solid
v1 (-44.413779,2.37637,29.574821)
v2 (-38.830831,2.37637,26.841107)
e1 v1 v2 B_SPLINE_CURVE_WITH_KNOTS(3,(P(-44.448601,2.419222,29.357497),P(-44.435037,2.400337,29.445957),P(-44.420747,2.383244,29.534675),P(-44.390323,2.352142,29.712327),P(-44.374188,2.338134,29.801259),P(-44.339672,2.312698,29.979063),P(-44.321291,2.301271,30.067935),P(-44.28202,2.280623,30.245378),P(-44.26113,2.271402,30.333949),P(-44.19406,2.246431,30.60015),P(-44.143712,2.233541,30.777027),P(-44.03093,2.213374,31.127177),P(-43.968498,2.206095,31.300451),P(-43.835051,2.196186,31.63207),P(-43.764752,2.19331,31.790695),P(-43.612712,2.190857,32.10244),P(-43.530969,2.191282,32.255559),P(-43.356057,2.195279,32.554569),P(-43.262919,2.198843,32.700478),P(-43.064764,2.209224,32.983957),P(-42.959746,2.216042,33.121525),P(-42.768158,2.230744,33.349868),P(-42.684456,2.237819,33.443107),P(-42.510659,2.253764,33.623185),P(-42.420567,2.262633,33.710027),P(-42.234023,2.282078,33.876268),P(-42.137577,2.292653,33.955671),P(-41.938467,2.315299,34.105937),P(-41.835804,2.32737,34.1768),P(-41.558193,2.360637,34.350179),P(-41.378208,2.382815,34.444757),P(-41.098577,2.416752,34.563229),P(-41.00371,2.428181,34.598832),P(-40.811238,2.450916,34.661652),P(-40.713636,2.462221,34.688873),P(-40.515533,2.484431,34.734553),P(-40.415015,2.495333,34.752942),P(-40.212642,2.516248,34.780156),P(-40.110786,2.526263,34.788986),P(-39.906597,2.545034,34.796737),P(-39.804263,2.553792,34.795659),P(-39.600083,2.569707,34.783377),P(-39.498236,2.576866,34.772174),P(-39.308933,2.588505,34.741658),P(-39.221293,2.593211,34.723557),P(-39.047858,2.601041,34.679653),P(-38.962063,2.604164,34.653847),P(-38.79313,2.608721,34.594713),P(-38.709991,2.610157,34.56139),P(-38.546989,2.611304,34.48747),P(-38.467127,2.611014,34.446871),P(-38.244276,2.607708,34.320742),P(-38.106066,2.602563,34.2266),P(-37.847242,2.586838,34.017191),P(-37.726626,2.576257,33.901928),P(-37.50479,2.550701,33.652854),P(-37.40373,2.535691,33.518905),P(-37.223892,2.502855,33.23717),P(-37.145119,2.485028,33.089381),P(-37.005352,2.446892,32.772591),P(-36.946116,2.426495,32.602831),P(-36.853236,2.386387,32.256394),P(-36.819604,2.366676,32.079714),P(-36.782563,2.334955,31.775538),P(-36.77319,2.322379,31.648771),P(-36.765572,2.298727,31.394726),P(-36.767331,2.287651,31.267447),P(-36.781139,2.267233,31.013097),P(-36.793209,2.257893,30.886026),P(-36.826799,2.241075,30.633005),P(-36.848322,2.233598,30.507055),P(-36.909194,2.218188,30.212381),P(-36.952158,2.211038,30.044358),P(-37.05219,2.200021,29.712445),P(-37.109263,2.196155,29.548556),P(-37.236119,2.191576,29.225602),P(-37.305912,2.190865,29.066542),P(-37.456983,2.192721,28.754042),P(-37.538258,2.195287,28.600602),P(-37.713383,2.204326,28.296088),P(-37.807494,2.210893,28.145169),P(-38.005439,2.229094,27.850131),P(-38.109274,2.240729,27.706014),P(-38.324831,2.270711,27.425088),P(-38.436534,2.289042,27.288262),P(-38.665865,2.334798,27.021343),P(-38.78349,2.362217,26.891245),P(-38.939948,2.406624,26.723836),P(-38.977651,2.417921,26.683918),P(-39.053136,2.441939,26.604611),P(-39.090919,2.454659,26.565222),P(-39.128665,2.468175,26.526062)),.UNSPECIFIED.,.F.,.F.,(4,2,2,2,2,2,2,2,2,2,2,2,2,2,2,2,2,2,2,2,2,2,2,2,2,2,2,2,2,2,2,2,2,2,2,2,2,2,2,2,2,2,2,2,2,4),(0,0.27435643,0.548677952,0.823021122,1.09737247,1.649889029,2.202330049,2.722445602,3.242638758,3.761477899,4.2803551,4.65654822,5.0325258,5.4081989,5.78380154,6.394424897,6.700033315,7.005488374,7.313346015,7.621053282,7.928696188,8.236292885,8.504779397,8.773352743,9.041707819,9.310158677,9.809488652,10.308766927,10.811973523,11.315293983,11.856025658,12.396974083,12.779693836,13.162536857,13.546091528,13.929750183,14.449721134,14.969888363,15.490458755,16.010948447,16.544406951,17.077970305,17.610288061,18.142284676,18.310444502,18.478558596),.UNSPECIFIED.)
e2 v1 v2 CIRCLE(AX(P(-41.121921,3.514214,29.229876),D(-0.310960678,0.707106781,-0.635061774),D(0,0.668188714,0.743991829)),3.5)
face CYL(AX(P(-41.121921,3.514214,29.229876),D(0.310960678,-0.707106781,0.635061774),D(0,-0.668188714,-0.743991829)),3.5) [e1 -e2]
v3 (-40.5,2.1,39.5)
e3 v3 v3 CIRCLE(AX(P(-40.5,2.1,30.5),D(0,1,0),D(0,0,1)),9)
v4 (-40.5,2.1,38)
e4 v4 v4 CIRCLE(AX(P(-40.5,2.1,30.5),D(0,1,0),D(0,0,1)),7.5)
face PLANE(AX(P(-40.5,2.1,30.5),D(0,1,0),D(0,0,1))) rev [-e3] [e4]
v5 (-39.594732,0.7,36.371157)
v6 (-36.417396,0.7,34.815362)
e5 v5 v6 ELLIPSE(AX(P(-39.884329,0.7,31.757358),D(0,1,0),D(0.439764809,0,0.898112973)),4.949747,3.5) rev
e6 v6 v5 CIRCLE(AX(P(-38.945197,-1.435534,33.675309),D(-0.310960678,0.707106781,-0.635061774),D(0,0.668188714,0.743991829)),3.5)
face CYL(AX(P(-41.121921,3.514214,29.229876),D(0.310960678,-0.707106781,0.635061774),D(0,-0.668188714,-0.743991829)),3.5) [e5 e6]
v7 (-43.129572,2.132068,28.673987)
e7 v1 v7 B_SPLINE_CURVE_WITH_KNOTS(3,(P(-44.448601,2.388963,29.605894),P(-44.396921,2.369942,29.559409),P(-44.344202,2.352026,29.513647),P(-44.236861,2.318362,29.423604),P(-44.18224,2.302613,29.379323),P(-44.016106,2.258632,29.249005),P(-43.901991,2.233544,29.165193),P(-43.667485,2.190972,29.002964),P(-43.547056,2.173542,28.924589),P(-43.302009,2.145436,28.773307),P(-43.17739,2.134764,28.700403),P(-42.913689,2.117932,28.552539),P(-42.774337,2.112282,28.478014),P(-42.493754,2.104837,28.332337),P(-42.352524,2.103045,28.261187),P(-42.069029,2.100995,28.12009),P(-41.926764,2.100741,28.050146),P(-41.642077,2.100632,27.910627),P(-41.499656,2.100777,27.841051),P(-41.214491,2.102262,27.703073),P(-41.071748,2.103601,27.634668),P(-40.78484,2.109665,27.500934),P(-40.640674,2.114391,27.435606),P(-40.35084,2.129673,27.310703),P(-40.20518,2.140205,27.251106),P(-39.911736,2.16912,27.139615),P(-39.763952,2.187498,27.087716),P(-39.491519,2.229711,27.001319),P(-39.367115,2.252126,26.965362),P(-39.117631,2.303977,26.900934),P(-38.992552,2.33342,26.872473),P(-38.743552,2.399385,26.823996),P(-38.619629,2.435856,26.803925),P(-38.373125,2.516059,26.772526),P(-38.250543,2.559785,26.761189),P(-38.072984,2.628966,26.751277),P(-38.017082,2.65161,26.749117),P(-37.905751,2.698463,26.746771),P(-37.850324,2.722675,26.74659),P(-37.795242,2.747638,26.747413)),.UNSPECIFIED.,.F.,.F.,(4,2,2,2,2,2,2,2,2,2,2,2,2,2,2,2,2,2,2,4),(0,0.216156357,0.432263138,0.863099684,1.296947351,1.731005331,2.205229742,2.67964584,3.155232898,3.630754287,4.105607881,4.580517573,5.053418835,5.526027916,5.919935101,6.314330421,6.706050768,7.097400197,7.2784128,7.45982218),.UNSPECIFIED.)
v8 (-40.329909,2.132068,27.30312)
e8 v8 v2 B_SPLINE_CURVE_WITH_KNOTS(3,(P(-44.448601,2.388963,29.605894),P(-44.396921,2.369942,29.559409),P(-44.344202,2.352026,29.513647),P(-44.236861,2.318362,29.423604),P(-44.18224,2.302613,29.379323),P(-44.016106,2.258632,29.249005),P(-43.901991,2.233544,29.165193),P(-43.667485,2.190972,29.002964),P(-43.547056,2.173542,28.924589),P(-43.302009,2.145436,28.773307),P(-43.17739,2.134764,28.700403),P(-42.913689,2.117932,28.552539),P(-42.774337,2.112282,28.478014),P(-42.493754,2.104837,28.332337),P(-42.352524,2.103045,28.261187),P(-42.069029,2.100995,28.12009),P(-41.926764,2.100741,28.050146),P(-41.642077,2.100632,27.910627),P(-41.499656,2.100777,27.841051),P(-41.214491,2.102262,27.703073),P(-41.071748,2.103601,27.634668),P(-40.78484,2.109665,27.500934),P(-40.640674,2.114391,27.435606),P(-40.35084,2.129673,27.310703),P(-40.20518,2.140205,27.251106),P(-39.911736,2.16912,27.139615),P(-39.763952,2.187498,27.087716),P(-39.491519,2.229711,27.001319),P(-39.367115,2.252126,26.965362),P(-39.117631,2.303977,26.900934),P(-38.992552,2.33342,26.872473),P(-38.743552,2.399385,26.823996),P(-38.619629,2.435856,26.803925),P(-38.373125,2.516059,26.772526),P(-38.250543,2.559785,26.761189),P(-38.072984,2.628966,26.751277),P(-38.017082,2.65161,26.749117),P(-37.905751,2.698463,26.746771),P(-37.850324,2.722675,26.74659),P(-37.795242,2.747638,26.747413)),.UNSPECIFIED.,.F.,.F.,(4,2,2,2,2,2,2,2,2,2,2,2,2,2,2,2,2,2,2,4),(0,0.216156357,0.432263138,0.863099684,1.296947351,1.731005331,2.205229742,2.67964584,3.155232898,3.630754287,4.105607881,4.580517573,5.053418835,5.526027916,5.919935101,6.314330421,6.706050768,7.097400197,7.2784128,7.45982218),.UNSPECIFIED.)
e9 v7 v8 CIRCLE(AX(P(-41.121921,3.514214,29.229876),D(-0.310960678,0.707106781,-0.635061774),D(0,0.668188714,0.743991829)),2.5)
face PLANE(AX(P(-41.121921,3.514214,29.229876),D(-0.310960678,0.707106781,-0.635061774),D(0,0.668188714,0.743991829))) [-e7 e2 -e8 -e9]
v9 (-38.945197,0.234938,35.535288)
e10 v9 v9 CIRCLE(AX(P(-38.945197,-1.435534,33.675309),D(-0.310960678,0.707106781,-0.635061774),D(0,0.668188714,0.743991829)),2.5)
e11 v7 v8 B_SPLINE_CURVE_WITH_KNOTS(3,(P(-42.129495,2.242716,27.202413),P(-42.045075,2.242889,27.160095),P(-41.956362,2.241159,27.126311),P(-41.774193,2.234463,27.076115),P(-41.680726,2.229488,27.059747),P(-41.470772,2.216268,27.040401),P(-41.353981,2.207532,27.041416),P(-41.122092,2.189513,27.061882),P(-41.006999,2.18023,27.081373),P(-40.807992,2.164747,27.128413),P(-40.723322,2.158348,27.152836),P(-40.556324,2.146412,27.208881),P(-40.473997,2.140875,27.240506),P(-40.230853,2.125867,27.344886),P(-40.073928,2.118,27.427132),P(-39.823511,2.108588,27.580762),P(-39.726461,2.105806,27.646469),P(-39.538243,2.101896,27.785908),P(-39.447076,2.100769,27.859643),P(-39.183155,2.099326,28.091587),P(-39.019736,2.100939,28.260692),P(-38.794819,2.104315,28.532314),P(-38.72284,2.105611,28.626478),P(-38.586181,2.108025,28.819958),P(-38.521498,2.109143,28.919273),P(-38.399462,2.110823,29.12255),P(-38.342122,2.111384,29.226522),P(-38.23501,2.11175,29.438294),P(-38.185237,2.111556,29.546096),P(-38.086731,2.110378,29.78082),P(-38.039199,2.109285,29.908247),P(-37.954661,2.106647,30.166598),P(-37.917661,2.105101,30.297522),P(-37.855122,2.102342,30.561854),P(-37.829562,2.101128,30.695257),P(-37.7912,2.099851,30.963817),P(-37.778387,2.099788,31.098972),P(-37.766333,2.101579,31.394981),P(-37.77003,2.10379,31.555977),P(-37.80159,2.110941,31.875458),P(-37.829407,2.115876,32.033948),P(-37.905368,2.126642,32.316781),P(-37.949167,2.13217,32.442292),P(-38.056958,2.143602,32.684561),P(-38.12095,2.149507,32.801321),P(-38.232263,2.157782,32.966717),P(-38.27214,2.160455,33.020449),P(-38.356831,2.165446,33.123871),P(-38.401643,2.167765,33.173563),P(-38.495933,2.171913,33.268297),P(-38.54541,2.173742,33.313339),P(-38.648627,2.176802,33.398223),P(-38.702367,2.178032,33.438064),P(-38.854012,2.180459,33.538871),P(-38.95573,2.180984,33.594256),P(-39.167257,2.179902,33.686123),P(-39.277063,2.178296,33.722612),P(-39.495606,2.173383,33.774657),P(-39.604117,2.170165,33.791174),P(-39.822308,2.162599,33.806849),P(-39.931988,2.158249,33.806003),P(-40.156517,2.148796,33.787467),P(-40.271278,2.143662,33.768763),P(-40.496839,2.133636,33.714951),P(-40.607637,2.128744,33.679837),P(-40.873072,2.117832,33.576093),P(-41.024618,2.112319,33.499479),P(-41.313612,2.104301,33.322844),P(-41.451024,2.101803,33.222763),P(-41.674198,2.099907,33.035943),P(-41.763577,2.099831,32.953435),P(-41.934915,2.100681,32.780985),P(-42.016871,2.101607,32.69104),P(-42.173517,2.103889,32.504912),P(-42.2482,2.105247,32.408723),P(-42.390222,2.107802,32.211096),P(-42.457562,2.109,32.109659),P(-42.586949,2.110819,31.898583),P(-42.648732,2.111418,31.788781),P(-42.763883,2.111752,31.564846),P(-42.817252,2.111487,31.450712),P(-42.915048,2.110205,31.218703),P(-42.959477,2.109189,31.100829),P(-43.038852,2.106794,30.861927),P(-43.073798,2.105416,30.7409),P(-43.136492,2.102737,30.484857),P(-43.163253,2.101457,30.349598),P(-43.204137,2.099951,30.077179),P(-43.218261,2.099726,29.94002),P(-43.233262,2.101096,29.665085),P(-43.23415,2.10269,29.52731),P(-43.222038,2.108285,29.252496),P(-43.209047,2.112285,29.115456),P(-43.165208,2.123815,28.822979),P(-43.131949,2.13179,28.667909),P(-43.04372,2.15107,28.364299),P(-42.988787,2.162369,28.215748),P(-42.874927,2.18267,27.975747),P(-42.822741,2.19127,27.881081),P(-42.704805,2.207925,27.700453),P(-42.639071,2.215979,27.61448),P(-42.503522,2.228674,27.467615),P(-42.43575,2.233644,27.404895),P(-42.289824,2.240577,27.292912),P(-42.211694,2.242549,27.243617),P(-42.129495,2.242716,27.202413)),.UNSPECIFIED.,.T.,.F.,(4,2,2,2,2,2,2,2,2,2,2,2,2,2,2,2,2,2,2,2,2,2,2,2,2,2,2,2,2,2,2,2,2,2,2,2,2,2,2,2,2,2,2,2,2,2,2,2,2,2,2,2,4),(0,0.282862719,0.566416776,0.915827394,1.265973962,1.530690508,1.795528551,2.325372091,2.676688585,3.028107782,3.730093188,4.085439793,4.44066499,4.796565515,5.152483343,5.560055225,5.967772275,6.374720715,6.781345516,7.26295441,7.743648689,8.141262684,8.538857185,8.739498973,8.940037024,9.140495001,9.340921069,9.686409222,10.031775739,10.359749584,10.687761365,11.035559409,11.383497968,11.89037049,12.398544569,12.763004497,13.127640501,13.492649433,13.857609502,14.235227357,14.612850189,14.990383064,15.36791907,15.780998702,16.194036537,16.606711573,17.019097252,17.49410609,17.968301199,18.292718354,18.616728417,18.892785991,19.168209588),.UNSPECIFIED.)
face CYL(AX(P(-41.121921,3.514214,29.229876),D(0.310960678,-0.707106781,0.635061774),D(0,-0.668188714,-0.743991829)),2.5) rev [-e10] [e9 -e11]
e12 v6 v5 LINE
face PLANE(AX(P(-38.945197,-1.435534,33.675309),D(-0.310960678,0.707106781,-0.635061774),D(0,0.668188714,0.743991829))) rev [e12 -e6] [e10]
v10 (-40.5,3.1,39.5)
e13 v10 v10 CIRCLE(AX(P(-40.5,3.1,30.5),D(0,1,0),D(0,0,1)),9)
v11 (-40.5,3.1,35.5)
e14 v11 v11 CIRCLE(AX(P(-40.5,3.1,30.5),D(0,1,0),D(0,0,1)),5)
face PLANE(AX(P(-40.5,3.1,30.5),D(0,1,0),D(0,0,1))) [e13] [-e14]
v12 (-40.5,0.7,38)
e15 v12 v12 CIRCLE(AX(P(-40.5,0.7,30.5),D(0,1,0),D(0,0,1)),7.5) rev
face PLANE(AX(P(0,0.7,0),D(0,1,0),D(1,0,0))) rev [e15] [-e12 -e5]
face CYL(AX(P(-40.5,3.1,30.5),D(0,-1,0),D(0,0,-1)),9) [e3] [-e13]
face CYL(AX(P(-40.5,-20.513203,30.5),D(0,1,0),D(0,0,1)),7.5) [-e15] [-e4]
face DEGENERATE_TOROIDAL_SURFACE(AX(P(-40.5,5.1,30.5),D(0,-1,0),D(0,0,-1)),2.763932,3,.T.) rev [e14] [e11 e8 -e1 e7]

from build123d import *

# Parameters (mm, degrees)
SKETCH1_R           = 7.5
BOSS_EXTRUDE2_DEPTH = 1.4
SKETCH3_R           = 9
SKETCH3_R_2         = 5
BOSS_EXTRUDE3_DEPTH = 1
FILLET1_R           = 3
SKETCH4_R           = 3.5
SKETCH4_R_2         = 2.5
BOSS_EXTRUDE5_DEPTH = 7
SKETCH5_R           = 2.5
CUT_EXTRUDE1_DEPTH  = 64.560554084


with BuildPart() as part:
    # Sketch1 → Boss-Extrude2 (new body)
    with BuildSketch(Plane(origin=(0, 2.1, 0), x_dir=(1, 0, 0), z_dir=(0, 1, 0))):
        with Locations(Location((-40.5, -30.5, 0), (0, 0, 270))):
            Circle(SKETCH1_R)
    extrude(amount=-BOSS_EXTRUDE2_DEPTH)

    # Sketch3 → Boss-Extrude3 (add)
    with BuildSketch(Plane(origin=(0, 2.1, 0), x_dir=(1, 0, 0), z_dir=(0, 1, 0))):
        with Locations(Location((-40.5, -30.5, 0), (0, 0, 270))):
            Circle(SKETCH3_R)
        with Locations(Location((-40.5, -30.5, 0), (0, 0, 270))):
            Circle(SKETCH3_R_2, mode=Mode.SUBTRACT)
    extrude(amount=BOSS_EXTRUDE3_DEPTH)

    # Fillet1
    # the kernel refuses this fillet: 3 mm, written as the material it adds along each edge
    with BuildSketch(Plane(origin=(-40.5, 2.1, 30.5), x_dir=(0, 0, 1), z_dir=(-1, 0, 0))) as fillet1_piece_1:
        with BuildLine():
            CenterArc((2.763932023, 3), FILLET1_R, 270, 48.189685104)
            Line((2.763932023, 0), (2.763932023, -0.06))
            Line((2.763932023, -0.06), (5, -0.06))
            Line((5, -0.06), (5.06, 0))
            ThreePointArc((5.06, 0), (5.06, 0.5), (5.04472136, 0.96))
            Line((5.04472136, 0.96), (5, 1))
        make_face()
    revolve(axis=Axis((-40.5, 2.1, 30.5), (0, 1, 0)))

    # Sketch4 → Boss-Extrude5 (add)
    with BuildSketch(Plane(origin=(-38.945196608, -1.435533906, 33.675308869), x_dir=(0.9504227777675709, 0.2313522039987804, -0.20778041583720402), z_dir=(-0.3109606783832559, 0.7071067811865516, -0.6350617737664737))):
        Circle(SKETCH4_R)
        with Locations(Location((0, 0, 0), (0, 0, 70.528842864))):
            Circle(SKETCH4_R_2, mode=Mode.SUBTRACT)
    extrude(amount=BOSS_EXTRUDE5_DEPTH)

    # Sketch5 → Cut-Extrude1 (cut, through all)
    with BuildSketch(Plane(origin=(3.199957151, -7.276519373, 6.535136451), x_dir=(0.9504227777675709, 0.2313522039987803, -0.20778041583720397), z_dir=(0.3109606783832558, -0.7071067811865516, 0.6350617737664735))):
        with Locations(Location((-44.343585554, 24.094947098, 0), (0, 0, 289.471157136))):
            Circle(SKETCH5_R)
    extrude(amount=-CUT_EXTRUDE1_DEPTH, mode=Mode.SUBTRACT)


solid = part.part
